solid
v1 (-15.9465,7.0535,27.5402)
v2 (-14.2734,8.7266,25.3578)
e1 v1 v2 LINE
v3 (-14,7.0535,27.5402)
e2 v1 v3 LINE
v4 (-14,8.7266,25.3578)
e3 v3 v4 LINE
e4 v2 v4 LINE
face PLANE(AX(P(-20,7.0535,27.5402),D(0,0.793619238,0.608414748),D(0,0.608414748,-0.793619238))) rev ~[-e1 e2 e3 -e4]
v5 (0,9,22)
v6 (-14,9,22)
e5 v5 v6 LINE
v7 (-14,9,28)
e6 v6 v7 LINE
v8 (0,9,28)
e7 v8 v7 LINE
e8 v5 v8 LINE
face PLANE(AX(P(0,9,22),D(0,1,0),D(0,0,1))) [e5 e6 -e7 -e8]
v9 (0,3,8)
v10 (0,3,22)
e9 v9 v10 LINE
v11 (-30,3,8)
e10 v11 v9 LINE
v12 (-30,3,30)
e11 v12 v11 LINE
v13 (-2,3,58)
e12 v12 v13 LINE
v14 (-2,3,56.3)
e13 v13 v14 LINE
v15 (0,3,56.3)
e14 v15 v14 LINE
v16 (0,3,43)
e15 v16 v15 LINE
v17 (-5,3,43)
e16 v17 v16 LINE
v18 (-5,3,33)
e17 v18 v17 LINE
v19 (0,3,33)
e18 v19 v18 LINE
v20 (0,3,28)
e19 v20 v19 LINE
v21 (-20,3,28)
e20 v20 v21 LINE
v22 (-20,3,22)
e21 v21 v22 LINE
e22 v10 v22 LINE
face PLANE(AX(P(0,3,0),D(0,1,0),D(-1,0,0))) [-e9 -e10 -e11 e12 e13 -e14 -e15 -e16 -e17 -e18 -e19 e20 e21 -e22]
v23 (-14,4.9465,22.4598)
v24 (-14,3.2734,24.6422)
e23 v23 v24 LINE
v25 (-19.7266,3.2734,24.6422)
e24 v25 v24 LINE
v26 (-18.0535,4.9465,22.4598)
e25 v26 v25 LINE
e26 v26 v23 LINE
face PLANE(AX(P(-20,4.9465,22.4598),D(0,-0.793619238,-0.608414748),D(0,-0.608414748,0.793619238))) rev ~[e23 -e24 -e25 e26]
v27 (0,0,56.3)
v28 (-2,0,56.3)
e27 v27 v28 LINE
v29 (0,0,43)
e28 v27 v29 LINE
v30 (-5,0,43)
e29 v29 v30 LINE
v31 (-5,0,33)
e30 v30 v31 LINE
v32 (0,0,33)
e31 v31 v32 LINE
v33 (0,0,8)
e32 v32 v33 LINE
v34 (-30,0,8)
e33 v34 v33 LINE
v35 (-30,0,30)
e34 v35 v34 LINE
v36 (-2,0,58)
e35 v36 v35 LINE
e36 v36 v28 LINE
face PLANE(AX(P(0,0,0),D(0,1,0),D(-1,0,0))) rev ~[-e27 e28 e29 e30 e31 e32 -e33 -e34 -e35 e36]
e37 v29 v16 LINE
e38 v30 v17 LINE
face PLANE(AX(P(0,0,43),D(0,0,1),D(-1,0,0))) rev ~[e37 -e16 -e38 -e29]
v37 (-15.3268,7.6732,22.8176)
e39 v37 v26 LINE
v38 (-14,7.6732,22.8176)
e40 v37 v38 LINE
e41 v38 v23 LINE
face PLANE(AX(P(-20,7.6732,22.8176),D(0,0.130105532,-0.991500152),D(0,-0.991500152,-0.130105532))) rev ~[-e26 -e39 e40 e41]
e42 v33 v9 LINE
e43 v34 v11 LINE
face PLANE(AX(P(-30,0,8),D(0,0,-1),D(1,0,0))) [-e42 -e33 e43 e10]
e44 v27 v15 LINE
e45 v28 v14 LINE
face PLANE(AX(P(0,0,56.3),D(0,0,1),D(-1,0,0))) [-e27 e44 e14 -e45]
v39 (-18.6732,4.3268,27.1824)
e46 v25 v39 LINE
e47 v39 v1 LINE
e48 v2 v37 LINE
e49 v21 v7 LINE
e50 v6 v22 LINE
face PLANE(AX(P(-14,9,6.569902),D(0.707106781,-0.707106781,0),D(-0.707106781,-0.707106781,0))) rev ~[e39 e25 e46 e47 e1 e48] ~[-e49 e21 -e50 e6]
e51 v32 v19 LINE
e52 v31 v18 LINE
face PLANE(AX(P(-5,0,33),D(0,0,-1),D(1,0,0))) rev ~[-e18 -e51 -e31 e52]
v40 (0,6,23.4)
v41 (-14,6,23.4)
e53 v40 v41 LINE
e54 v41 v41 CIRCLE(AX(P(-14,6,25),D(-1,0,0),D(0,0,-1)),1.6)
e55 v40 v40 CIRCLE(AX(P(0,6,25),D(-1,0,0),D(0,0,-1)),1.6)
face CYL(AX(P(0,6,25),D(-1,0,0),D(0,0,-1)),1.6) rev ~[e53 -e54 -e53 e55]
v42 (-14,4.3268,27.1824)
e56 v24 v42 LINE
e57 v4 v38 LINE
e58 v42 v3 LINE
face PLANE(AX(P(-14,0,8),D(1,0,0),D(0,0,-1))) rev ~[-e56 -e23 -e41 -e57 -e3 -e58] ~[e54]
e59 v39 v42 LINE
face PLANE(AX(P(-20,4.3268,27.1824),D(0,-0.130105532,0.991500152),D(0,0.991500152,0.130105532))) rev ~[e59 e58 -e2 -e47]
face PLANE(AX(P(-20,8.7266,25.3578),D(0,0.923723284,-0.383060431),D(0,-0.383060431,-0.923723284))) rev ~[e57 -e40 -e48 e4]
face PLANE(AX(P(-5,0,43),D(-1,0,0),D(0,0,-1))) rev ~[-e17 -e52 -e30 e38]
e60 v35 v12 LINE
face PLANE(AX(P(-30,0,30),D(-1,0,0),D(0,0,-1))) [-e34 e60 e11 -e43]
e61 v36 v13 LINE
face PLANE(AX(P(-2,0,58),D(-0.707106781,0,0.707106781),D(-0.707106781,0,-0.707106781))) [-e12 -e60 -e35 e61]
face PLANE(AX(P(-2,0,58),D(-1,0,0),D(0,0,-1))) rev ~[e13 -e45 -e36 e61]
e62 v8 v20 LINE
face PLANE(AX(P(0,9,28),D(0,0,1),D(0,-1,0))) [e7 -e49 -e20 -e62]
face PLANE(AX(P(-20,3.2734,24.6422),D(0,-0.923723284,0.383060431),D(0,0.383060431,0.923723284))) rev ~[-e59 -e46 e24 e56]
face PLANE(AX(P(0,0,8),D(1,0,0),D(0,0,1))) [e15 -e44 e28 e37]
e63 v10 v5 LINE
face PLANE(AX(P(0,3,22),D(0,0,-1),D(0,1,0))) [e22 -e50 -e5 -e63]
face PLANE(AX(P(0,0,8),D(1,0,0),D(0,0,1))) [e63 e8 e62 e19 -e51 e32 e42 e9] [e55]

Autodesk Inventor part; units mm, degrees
ref_plane "YZ Plane" through (0, 0, 0) normal (1, 0, 0) x (0, 1, 0)
ref_plane "XZ Plane" through (0, 0, 0) normal (0, 1, 0) x (-1, 0, 0)
ref_plane "XY Plane" through (0, 0, 0) normal (0, 0, 1) x (1, 0, 0)
sketch "Szkic1" plane through (0, 0, 0) normal (0, 1, 0) x (-1, 0, 0)
  line L0 (0, 8) -> (0, 56.3)
  line L1 (0, 58) -> (2, 58) construction
  line L2 (2, 58) -> (2, 56.3) construction
  line L3 (2, 56.3) -> (0, 56.3) construction
  line L4 (0, 56.3) -> (0, 58) construction
  line L5 (30, 8) -> (30, 66.5) construction
  line L6 (2, 58) -> (30, 30)
  line L7 (2, 58) -> (41.598, 58) construction
  line L8 (30, 30) -> (30, 8)
  line L9 (2, 58) -> (2, 56.3)
  line L10 (0, 56.3) -> (2, 56.3)
  line L11 (2, 56.3) -> (2, 54.3) construction
  line L12 (0, 43) -> (5, 43)
  line L13 (5, 43) -> (5, 33)
  line L14 (5, 33) -> (0, 33)
  line L15 (0, 33) -> (0, 43)
  line L16 (30, 8) -> (0, 8)
  line L17 (30, 8) -> (30, 30)
  point P0 (0, 0)
  point P1 (0, 33)
  dimension "d0" = 58
  dimension "d1" = 2
  dimension "d2" = 1.7
  dimension "d4" = 45
  dimension "d7" = 2
  dimension "d8" = 5
  dimension "d9" = 10
  dimension "d13" = 30
  dimension "d14" = 22
  dimension "d15" = 58.5
  dimension "d16" = 30
  dimension "d17" = 25
  dimension "d18" = 8
extrude "Wyciągnięcie proste1" add sketch "Szkic1" along normal blind 3
extrude "Wyciągnięcie proste2" cut sketch "Szkic1" along normal blind 10 contours L0 L12 L13 L14
sketch "Sketch2" plane through (0, 0, 8) normal (1, 0, 0) x (0, 0, -1)
  line L0 (-25, 3) -> (0, 3) projected
  line L1 (-20, 3) -> (-14, 3)
  line L2 (-14, 3) -> (-14, 9)
  line L3 (-14, 9) -> (-20, 9)
  line L4 (-20, 9) -> (-20, 3)
  line L5 (-14.4598, 4.9465) -> (-16.6422, 3.2734)
  line L6 (-16.6422, 3.2734) -> (-19.1824, 4.3268)
  line L7 (-19.1824, 4.3268) -> (-19.5402, 7.0535)
  line L8 (-19.5402, 7.0535) -> (-17.3578, 8.7266)
  line L9 (-17.3578, 8.7266) -> (-14.8176, 7.6732)
  line L10 (-14.8176, 7.6732) -> (-14.4598, 4.9465)
  point P0 (8, 0)
  point P1 (-17, 6)
  point P2 (-17, 6)
  dimension "d19" = 6
  dimension "d20" = 6
  dimension "d21" = 5
  dimension "d24" = 3
  dimension "d25" = 3
  dimension "d29" = 1.6731
  dimension "d30" = 2.75
extrude "Extrusion3" add sketch "Sketch2" against normal blind 20 contours L4 L3 L2 L0 | L5 L6 L7 L8 L9 L10
extrude "Extrusion4" cut sketch "Sketch2" along normal blind 6 from surface at -20 contours L5 L6 L7 L8 L9 L10
chamfer "Chamfer2" distance 6 angle 45 1 edges at (-20, 9, 25)
hole "Hole1" at (0, 6, 25) direction (-1, 0, 0) diameter 3.2 depth 30 clearance for "Countersunk Flat Head Screw ISO 2009/7046" size "M3" standard "ISO"
properties part number "ScianaBocznaPEMv2"
